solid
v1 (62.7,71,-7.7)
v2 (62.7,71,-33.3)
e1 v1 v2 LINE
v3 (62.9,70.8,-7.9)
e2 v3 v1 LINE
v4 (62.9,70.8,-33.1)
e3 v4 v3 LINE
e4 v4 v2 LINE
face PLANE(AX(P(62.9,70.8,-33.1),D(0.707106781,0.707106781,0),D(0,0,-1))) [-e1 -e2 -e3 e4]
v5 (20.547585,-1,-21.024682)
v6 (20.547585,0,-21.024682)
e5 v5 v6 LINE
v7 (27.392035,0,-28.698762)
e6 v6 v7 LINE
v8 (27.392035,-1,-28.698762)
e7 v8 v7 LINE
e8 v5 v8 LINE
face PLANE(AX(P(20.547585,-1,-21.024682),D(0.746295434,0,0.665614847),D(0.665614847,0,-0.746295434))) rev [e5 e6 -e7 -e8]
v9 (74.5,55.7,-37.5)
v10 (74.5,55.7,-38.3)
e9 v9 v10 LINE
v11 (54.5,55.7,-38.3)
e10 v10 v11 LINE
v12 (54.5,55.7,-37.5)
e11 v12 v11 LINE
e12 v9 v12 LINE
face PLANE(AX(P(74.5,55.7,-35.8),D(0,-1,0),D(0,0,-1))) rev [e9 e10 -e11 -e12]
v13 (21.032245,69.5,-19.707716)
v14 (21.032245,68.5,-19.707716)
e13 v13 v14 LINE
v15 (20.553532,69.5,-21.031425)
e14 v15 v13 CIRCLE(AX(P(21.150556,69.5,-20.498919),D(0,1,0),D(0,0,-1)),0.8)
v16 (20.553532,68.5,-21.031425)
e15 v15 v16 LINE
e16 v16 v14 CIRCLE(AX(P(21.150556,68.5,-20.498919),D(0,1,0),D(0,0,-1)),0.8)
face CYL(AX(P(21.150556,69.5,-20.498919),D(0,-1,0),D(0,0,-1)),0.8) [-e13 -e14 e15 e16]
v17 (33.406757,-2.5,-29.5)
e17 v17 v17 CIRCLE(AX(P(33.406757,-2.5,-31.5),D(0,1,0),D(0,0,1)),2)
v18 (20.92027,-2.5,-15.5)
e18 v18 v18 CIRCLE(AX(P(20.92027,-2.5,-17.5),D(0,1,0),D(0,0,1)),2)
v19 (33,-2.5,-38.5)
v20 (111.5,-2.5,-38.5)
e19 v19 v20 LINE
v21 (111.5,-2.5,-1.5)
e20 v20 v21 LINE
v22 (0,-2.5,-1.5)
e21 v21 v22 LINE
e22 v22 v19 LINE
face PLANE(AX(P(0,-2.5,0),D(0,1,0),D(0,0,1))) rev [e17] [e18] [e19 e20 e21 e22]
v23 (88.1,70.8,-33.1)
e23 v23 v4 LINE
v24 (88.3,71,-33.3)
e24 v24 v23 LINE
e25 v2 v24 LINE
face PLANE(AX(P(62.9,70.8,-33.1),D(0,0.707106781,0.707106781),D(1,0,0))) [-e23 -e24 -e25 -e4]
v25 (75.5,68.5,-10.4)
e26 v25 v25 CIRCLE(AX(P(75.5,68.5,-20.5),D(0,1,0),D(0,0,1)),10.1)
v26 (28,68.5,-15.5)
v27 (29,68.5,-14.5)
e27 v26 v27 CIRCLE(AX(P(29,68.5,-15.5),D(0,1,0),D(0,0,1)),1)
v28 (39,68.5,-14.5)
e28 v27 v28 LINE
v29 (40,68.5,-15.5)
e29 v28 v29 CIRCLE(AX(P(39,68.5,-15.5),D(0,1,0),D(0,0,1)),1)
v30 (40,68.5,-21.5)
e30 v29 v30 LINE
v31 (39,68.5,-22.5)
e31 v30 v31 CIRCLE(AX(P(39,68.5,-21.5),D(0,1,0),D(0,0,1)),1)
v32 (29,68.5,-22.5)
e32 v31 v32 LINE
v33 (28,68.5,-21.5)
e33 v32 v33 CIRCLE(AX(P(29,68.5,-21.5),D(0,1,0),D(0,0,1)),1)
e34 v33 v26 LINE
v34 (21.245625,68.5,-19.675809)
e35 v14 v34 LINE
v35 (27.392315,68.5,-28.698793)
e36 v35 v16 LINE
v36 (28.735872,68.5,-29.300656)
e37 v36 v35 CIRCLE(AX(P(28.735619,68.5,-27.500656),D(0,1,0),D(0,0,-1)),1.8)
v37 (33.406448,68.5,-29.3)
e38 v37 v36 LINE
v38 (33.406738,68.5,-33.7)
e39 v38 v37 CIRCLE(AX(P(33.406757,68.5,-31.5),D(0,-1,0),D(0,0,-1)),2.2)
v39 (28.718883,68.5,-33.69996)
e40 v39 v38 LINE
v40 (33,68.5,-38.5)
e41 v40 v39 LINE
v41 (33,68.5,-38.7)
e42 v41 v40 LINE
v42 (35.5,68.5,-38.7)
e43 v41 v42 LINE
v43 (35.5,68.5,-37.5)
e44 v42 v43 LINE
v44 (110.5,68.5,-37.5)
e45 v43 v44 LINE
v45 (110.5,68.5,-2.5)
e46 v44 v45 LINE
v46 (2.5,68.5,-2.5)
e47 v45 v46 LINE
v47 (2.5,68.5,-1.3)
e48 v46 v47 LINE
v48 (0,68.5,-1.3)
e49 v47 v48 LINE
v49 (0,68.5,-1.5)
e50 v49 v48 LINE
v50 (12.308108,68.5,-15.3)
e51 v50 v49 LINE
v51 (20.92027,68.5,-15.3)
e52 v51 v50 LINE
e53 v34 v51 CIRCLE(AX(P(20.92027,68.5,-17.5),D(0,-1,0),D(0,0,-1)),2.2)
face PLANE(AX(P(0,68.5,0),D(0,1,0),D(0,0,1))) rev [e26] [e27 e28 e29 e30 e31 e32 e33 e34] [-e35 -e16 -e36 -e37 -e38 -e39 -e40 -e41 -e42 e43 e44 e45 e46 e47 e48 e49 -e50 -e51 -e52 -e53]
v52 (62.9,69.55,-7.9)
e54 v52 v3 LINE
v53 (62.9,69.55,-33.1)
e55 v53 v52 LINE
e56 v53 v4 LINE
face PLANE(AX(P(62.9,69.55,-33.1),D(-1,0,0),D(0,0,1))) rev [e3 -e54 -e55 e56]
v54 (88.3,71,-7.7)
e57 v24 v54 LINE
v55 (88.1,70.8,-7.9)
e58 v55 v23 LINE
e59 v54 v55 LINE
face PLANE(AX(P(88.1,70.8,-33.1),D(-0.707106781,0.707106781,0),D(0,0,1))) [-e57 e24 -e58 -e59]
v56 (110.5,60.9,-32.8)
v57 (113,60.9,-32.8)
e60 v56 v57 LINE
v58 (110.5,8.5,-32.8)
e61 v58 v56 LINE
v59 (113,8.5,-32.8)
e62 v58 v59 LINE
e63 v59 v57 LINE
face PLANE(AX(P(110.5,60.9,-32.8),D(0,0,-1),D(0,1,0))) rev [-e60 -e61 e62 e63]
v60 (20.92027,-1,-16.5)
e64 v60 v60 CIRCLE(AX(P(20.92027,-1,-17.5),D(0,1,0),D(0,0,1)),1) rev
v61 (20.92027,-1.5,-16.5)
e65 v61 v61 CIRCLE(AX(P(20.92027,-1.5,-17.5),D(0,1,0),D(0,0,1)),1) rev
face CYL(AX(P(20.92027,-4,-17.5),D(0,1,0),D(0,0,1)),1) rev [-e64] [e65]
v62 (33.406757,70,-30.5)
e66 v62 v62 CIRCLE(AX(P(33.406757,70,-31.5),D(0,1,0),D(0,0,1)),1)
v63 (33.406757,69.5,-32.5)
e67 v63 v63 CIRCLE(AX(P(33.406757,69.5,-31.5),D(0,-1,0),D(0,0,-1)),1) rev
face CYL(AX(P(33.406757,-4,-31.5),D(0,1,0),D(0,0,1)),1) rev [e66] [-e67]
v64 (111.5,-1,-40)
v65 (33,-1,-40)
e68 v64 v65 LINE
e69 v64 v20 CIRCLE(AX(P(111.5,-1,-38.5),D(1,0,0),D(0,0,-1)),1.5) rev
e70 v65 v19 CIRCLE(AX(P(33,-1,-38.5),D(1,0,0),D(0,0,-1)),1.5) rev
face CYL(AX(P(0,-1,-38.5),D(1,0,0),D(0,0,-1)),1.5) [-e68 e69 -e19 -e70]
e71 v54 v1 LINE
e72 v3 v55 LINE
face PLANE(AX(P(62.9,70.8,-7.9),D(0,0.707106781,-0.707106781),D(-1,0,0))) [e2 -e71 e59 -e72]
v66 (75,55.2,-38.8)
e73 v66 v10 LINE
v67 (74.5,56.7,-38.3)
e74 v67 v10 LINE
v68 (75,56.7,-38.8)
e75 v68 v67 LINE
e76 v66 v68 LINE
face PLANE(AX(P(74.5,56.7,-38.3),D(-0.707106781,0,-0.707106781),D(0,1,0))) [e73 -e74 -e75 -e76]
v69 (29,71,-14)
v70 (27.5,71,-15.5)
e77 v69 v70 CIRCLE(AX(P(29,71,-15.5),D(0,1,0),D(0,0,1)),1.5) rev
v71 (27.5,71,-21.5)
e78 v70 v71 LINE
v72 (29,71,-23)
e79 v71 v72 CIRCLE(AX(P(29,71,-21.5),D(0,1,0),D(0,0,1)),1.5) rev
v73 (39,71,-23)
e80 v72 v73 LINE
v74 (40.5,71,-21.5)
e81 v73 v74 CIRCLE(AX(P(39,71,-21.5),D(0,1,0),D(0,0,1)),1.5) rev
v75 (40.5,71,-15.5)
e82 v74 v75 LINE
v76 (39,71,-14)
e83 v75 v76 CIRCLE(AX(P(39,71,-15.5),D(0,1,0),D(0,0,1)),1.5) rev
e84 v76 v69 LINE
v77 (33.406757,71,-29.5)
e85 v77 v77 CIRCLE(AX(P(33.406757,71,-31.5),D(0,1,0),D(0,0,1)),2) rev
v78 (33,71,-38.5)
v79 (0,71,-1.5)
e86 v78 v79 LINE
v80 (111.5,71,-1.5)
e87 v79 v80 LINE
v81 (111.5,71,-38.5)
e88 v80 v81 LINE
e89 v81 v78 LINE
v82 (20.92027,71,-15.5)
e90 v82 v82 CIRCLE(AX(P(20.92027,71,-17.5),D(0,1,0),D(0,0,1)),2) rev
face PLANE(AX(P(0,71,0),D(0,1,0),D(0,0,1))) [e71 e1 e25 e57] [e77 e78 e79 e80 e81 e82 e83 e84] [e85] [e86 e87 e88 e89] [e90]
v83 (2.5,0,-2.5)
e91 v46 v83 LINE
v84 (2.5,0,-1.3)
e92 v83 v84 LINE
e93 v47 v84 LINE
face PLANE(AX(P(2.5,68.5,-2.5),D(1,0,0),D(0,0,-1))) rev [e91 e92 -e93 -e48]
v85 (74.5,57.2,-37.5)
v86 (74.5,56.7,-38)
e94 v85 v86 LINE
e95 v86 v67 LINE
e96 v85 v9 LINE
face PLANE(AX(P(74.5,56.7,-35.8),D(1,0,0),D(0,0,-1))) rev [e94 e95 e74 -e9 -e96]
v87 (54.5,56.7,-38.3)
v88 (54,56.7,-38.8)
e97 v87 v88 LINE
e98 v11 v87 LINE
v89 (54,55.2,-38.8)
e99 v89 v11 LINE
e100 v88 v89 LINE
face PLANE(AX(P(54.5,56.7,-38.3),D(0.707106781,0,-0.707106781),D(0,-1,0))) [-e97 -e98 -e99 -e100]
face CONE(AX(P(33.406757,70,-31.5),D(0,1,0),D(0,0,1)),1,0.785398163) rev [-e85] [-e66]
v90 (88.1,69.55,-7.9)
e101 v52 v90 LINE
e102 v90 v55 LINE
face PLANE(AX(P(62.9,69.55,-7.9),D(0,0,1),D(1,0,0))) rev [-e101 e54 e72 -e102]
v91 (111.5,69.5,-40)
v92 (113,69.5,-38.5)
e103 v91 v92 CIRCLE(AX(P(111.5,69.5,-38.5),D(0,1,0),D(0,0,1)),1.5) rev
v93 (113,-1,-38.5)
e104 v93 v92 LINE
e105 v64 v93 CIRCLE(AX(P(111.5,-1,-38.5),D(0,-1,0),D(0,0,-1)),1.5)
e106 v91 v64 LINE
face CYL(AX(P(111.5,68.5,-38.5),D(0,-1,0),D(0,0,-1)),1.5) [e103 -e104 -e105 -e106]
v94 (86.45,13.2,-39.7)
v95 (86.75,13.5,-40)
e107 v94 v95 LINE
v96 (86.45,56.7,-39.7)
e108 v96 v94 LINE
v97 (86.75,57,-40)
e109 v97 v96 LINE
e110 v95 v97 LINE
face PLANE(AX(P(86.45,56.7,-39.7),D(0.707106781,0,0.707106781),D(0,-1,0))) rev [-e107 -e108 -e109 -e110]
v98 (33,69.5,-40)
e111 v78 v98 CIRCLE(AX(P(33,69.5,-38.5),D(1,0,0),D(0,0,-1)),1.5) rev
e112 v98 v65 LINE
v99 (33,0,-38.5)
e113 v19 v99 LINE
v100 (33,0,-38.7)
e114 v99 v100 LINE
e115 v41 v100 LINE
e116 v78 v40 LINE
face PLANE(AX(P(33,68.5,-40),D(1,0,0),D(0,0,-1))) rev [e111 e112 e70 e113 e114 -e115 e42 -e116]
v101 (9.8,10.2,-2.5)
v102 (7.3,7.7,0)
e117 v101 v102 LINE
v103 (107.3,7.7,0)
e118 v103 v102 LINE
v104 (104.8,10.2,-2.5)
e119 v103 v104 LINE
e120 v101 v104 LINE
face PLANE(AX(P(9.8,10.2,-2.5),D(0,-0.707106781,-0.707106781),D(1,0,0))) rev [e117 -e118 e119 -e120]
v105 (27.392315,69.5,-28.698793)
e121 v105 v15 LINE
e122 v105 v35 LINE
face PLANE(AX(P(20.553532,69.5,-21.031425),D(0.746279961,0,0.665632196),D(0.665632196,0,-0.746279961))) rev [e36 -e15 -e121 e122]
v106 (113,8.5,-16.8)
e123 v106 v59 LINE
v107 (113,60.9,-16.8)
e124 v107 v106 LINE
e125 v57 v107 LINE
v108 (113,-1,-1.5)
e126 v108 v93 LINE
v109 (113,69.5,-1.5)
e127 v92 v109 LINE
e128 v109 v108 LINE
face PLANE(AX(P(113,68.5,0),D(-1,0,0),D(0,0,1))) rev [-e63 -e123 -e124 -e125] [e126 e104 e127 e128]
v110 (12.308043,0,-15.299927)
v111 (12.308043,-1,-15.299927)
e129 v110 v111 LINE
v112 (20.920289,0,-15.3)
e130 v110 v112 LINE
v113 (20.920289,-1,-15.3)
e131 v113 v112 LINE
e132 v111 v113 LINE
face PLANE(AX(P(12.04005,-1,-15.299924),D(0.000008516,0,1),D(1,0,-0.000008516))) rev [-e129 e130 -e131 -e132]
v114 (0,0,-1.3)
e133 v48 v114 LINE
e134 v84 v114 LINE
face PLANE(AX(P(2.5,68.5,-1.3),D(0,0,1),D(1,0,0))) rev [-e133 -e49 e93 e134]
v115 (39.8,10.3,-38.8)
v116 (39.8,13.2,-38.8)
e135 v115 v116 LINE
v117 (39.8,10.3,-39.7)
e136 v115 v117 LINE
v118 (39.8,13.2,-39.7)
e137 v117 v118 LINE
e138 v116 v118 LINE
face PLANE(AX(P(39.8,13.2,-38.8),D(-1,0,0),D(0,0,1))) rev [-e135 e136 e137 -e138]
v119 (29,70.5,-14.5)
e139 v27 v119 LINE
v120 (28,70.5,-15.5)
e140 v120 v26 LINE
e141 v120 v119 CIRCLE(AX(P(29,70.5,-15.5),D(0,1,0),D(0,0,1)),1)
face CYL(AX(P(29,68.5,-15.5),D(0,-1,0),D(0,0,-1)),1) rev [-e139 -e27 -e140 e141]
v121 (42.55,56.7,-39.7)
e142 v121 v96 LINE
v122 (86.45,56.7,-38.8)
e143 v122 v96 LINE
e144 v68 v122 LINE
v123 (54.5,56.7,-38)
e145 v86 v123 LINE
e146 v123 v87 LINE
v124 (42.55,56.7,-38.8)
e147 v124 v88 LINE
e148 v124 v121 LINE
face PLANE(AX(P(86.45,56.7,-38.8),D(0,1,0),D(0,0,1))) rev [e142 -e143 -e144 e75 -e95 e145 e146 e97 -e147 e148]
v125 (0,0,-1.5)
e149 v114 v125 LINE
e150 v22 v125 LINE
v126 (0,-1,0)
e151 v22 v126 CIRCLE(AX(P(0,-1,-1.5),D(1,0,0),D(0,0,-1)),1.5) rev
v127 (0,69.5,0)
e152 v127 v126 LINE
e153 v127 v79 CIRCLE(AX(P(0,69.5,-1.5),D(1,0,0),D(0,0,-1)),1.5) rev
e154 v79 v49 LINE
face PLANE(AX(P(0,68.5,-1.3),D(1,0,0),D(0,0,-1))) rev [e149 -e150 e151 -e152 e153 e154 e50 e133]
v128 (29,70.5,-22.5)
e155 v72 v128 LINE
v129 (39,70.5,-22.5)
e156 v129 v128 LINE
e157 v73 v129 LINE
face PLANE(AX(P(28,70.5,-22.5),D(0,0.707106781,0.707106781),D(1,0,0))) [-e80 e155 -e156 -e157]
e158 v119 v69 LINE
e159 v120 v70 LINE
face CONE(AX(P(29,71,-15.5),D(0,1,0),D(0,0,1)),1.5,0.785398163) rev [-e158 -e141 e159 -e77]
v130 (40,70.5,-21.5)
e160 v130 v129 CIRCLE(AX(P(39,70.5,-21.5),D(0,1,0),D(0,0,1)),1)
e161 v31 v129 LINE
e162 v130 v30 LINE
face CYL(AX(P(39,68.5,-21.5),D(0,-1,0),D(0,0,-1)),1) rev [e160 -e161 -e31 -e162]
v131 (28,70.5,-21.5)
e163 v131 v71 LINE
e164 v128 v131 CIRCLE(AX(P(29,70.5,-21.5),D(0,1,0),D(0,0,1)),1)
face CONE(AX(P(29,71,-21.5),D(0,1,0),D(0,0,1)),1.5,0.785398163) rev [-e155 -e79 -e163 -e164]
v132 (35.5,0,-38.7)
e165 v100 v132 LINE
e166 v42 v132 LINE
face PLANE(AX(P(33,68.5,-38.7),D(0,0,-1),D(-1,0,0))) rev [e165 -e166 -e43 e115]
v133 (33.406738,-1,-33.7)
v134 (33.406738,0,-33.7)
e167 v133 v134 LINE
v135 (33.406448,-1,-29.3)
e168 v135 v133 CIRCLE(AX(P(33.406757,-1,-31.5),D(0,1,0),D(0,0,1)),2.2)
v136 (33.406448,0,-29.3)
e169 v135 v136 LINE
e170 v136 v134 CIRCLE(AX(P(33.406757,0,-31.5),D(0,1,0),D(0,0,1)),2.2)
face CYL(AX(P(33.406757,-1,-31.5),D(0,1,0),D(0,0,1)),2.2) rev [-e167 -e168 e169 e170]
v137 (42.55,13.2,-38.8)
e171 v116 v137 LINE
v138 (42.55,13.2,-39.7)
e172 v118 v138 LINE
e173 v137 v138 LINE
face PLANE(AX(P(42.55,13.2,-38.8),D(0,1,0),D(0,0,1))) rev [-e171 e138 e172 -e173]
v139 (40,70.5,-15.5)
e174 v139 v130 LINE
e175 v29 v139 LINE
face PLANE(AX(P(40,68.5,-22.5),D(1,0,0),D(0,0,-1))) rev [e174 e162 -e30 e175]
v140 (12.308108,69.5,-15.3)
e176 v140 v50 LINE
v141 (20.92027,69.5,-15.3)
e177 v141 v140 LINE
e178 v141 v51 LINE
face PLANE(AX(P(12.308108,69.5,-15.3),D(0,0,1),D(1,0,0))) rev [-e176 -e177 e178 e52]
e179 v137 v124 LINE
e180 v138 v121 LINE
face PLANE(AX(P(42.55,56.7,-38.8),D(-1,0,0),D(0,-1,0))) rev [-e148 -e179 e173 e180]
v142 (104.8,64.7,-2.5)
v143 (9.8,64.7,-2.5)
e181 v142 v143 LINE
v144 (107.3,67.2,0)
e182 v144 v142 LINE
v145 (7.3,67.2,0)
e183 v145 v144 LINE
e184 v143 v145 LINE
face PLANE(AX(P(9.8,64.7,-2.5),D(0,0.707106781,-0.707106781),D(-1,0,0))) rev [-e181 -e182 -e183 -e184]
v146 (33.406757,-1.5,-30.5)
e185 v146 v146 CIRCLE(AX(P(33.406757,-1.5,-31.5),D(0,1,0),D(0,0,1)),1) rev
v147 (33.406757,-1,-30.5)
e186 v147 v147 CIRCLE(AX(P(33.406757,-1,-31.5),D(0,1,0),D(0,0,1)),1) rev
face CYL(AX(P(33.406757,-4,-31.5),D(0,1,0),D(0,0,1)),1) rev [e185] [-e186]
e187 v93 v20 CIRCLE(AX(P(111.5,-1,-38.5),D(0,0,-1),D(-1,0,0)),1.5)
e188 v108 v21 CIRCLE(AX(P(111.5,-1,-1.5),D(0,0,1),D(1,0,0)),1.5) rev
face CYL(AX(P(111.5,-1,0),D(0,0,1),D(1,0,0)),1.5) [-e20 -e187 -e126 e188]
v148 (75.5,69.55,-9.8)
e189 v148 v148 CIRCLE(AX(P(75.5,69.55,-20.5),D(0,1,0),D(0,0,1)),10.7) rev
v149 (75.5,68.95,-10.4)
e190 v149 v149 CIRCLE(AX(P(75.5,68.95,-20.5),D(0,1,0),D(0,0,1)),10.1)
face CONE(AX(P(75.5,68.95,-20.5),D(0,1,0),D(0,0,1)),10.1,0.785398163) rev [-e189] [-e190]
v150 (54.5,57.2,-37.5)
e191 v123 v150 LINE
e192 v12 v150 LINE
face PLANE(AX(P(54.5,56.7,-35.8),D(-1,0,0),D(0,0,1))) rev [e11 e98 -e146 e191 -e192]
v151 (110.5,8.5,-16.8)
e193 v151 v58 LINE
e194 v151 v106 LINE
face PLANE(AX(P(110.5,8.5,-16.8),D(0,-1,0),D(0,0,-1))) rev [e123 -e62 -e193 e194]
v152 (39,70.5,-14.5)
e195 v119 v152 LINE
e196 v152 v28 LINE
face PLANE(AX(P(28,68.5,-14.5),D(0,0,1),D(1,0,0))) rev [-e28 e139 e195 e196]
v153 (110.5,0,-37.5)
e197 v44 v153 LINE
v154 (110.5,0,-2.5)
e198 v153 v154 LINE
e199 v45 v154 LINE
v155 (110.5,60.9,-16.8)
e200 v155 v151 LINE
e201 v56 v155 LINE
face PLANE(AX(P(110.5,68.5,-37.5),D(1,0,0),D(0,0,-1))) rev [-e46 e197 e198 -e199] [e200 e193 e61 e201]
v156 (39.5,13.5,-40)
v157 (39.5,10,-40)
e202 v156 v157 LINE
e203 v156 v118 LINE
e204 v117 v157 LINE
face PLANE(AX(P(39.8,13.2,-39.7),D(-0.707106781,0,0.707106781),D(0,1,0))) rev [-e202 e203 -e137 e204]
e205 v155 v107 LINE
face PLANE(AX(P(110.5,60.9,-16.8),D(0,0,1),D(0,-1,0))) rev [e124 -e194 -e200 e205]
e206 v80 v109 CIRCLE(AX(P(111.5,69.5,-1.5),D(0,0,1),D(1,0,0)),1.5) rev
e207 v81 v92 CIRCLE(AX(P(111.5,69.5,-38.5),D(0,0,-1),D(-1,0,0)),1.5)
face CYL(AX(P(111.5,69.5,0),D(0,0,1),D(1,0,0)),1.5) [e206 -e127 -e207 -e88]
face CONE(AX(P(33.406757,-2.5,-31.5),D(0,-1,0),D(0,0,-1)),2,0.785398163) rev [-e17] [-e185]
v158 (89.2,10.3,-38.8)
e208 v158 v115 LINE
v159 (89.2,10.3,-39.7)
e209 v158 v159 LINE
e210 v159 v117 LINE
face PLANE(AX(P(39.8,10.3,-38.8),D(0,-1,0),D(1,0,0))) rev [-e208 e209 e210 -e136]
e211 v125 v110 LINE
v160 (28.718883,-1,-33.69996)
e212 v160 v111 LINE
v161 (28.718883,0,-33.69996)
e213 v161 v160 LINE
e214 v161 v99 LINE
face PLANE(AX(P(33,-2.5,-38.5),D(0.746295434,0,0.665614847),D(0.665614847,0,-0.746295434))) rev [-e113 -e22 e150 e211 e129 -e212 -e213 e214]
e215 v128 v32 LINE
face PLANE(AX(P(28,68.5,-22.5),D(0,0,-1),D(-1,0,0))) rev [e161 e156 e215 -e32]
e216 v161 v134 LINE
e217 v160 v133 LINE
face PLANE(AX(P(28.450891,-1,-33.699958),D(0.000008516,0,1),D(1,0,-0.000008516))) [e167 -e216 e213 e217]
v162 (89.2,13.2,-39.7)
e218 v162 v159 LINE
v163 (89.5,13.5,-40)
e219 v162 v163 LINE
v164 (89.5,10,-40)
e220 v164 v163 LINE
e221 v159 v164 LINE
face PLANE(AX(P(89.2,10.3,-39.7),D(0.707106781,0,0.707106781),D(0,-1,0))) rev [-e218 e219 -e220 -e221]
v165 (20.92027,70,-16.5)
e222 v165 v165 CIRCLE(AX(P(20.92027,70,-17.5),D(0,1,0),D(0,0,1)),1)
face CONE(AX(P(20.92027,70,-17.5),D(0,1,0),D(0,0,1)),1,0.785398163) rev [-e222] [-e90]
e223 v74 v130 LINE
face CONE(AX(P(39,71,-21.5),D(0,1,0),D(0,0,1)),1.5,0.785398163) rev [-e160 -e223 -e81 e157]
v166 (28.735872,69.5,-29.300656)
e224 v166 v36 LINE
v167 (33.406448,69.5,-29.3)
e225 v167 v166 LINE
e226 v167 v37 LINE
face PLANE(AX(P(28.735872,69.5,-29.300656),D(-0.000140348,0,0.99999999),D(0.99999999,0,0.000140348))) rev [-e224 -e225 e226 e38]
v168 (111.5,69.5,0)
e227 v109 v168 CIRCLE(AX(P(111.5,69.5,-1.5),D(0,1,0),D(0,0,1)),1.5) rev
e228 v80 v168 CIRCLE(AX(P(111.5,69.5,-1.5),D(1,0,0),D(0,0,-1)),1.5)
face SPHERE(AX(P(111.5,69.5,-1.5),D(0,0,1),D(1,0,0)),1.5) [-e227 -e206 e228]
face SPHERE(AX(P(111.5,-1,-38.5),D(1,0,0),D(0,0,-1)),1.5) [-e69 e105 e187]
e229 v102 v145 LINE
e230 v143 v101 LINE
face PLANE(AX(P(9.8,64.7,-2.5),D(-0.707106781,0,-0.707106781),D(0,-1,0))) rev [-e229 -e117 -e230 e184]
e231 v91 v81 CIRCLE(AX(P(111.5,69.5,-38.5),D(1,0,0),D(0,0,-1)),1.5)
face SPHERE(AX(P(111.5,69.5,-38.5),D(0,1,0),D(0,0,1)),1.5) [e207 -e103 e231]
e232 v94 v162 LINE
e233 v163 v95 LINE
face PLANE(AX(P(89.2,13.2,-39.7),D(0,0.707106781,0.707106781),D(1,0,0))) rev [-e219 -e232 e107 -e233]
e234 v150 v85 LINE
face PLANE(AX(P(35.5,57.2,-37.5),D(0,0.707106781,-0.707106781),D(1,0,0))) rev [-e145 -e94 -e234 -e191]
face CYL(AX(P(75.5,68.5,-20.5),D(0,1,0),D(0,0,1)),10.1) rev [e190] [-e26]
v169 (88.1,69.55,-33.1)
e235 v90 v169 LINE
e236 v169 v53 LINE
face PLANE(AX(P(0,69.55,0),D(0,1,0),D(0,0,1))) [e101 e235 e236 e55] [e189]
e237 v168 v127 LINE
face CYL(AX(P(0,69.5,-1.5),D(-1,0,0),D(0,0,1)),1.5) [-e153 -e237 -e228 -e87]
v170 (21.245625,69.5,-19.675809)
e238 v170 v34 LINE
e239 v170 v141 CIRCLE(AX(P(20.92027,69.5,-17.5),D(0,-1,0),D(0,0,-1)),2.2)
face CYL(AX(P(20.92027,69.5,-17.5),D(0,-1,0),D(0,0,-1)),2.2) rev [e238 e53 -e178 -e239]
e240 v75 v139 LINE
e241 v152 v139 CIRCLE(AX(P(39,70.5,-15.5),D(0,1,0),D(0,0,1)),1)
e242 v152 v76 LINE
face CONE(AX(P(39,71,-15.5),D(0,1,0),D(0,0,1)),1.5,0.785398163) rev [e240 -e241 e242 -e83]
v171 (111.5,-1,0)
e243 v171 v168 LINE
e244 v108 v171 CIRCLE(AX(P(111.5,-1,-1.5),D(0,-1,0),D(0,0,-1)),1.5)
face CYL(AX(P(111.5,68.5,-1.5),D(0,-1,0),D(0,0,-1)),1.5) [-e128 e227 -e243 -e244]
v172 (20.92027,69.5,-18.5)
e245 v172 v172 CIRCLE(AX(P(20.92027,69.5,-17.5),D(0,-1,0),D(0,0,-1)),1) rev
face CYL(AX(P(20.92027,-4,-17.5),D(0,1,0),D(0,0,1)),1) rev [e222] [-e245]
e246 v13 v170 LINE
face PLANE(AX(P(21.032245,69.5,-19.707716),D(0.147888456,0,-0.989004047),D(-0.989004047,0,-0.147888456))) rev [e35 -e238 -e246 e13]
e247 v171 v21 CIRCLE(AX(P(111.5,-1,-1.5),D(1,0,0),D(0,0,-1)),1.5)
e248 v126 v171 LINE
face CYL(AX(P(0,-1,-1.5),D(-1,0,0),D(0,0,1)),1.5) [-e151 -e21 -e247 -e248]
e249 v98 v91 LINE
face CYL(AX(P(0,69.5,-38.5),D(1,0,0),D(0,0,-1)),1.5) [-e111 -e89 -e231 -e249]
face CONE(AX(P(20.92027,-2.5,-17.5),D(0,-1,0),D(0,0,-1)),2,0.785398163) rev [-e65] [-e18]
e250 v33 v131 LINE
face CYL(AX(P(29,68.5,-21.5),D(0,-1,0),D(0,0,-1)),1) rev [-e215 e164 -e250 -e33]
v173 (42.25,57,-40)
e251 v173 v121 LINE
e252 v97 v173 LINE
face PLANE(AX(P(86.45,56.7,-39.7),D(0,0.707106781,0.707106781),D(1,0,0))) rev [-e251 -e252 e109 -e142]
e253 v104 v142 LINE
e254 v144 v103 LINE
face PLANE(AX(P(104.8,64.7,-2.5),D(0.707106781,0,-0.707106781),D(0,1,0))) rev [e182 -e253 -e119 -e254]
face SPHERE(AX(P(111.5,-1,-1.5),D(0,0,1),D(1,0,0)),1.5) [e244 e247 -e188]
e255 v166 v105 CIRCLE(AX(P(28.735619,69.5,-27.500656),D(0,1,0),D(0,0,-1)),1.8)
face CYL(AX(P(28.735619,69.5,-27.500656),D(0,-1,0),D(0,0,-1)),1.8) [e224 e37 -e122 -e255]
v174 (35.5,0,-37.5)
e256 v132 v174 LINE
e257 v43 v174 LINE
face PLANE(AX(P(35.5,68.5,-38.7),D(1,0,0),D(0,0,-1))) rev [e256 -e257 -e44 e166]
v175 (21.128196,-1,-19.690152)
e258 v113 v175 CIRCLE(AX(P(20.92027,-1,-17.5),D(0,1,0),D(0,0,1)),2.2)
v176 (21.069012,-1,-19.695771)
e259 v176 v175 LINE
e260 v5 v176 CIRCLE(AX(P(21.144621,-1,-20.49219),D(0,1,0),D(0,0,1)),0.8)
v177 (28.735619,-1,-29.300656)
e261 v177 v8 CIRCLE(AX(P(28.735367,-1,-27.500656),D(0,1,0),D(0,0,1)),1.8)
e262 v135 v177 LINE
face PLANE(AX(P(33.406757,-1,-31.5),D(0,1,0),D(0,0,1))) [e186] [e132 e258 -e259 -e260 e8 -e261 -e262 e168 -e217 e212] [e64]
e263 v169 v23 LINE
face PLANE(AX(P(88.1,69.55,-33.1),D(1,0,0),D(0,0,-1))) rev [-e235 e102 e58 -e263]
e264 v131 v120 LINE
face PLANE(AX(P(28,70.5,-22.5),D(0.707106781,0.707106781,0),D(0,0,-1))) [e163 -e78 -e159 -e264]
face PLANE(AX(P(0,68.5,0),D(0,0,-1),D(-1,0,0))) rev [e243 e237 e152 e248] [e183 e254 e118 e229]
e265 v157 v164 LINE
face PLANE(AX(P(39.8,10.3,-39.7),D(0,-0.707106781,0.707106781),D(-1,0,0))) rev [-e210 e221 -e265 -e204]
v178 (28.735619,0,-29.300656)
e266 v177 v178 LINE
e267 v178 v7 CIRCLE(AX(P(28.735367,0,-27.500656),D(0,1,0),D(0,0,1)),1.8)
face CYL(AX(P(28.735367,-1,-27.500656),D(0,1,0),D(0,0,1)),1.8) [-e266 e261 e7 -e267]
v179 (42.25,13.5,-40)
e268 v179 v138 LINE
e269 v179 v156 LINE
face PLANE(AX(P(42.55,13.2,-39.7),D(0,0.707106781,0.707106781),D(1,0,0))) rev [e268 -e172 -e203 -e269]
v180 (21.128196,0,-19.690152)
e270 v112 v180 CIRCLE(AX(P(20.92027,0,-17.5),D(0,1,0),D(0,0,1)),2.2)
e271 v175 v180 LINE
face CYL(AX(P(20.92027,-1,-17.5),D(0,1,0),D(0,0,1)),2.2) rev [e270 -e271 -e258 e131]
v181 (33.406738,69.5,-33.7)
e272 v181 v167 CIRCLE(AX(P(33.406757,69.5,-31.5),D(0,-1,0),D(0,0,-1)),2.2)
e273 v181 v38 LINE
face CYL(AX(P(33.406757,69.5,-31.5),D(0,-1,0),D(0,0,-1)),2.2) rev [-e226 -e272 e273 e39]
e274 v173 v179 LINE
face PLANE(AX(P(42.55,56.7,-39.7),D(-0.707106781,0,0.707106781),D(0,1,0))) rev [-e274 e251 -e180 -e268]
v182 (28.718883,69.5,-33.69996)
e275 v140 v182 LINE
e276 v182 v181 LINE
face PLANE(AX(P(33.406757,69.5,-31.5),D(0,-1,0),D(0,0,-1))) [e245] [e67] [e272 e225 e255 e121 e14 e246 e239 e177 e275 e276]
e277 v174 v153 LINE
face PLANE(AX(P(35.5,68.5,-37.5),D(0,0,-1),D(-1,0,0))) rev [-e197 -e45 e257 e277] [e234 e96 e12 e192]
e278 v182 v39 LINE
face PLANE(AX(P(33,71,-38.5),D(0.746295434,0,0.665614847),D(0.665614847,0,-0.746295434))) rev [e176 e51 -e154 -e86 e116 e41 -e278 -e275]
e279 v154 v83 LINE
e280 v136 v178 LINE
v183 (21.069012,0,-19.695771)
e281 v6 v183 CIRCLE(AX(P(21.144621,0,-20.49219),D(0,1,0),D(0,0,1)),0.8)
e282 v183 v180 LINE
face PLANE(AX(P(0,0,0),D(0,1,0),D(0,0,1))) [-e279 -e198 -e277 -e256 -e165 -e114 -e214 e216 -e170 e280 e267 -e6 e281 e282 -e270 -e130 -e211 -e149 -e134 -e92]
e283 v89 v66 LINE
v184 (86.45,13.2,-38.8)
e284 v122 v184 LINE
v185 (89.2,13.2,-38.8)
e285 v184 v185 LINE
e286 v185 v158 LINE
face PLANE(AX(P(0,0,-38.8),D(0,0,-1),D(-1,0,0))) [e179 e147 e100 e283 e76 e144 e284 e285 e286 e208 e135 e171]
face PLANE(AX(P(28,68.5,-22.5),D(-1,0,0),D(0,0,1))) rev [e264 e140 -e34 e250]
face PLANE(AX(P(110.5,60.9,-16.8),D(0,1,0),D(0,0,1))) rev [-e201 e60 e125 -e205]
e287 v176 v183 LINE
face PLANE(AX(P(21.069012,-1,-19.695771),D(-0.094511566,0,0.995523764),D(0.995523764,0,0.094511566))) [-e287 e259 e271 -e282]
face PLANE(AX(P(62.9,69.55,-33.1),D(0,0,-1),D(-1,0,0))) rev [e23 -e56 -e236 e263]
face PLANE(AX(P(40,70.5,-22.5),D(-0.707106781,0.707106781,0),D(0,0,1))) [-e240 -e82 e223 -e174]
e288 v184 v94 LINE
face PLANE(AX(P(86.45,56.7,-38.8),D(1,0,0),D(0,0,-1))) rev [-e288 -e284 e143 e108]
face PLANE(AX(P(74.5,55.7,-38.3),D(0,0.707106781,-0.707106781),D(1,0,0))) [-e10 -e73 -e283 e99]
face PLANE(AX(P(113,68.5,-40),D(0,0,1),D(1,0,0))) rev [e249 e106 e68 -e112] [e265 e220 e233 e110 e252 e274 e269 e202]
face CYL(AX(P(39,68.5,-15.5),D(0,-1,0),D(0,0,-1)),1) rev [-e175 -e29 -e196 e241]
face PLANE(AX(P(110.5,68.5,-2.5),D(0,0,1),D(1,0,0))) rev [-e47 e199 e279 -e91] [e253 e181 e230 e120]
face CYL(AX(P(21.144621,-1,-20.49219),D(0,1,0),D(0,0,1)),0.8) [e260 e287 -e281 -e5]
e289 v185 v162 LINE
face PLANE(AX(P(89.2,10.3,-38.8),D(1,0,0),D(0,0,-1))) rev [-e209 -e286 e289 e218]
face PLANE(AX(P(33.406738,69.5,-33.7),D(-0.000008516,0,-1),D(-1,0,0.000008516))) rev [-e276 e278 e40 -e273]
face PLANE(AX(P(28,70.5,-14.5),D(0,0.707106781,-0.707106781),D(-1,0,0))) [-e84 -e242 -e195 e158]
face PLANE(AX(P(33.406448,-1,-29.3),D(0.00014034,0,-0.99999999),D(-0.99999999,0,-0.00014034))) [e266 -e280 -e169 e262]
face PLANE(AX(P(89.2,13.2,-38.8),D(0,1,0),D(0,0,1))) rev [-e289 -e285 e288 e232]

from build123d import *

# Parameters (mm, degrees)
BOSS_EXTRU_1_DEPTH       = 68.5
BOSS_EXTRU_2_DEPTH       = 2.5
ESQUISSE4_W              = 95
ESQUISSE4_H              = 54.5
ENL_V_MAT_EXTRU_1_DEPTH  = 2.5
ESQUISSE5_W              = 16
ESQUISSE5_H              = 52.4
ENL_V_MAT_EXTRU_2_DEPTH  = 2.5
BOSS_EXTRU_3_DEPTH       = 2.5
CHANFREIN1_SIZE          = 2.5
CONG_1_R                 = 1.5
ENL_V_MAT_EXTRU_3_DEPTH  = 1.2
CHANFREIN2_SIZE          = 0.3
ESQUISSE8_W              = 20
ESQUISSE8_H              = 1
ENL_V_MAT_EXTRU_4_DEPTH  = 3
CHANFREIN3_SIZE          = 0.5
CHANFREIN4_SIZE          = 0.5
ESQUISSE9_R              = 1
ENL_V_MAT_EXTRU_5_DEPTH  = 75
CHANFREIN5_SIZE          = 1
CHANFREIN6_SIZE          = 1
ENL_V_MAT_EXTRU_6_DEPTH  = 1
ENL_V_START              = -1
ENL_V_MAT_EXTRU_7_DEPTH  = 1
ESQUISSE13_W             = 12
ESQUISSE13_H             = 8
ENL_V_MAT_EXTRU_8_DEPTH  = 2.5
CONG_2_R                 = 1
CHANFREIN7_SIZE          = 0.5
ESQUISSE14_W             = 25.2
ESQUISSE14_H             = 25.2
ENL_V_MAT_EXTRU_9_DEPTH  = 1.45
CHANFREIN8_SIZE          = 0.2
ESQUISSE15_R             = 10.1
ENL_V_MAT_EXTRU_10_DEPTH = 1.05
CHANFREIN9_SIZE          = 0.6


with BuildPart() as part:
    # Esquisse2 → Boss.-Extru.1 (new body)
    with BuildSketch(Plane(origin=(0, 0, 0), x_dir=(1, 0, 0), z_dir=(0, 1, 0))):
        Polygon((0, 0), (113, 0), (113, 40), (33, 40), (33, 38.7), (35.5, 38.7), (35.5, 37.5), (110.5, 37.5), (110.5, 2.5), (2.5, 2.5), (2.5, 1.3), (0, 1.3), align=None)
    extrude(amount=BOSS_EXTRU_1_DEPTH)

    # Esquisse3 → Boss.-Extru.2 (add)
    with BuildSketch(Plane.XZ):
        Polygon((0, 0), (113, 0), (113, -40), (33, -40), (33, -38.5), (0, -1.5), align=None)
    extrude(amount=BOSS_EXTRU_2_DEPTH)

    # Esquisse4 → Enlèv. mat.-Extru.1 (cut)
    with BuildSketch(Plane.XY):
        with Locations((57.3, 37.45)):
            Rectangle(ESQUISSE4_W, ESQUISSE4_H)
    extrude(amount=-ENL_V_MAT_EXTRU_1_DEPTH, mode=Mode.SUBTRACT)

    # Esquisse5 → Enlèv. mat.-Extru.2 (cut)
    with BuildSketch(Plane(origin=(113, 0, 0), x_dir=(0, 0, -1), z_dir=(1, 0, 0))):
        with Locations((24.8, 34.7)):
            Rectangle(ESQUISSE5_W, ESQUISSE5_H)
    extrude(amount=-ENL_V_MAT_EXTRU_2_DEPTH, mode=Mode.SUBTRACT)

    # Esquisse6 → Boss.-Extru.3 (add)
    with BuildSketch(Plane(origin=(0, 68.5, 0), x_dir=(1, 0, 0), z_dir=(0, 1, 0))):
        Polygon((33, 40), (33, 38.5), (0, 1.5), (0, 0), (113, 0), (113, 40), align=None)
    extrude(amount=BOSS_EXTRU_3_DEPTH)

    # Chanfrein1
    chanfrein1_edges = [part.edges().sort_by_distance(p)[0] for p in [
        (57.3, 10.2, 0),
        (104.8, 37.45, 0),
        (57.3, 64.7, 0),
        (9.8, 37.45, 0),
    ]]
    chamfer(chanfrein1_edges, length=CHANFREIN1_SIZE - 0.0001)  # a hair under: the kernel refuses the full size

    # Congé1
    cong_1_edges = [part.edges().sort_by_distance(p)[0] for p in [
        (73, -2.5, -40),
        (113, -2.5, -20),
        (113, 34.25, -40),
        (56.5, -2.5, 0),
        (113, 34.25, 0),
        (73, 71, -40),
        (113, 71, -20),
        (56.5, 71, 0),
    ]]
    fillet(cong_1_edges, radius=CONG_1_R)

    # Esquisse7 → Enlèv. mat.-Extru.3 (cut)
    with BuildSketch(Plane(origin=(0, 0, -40), x_dir=(-1, 0, 0), z_dir=(0, 0, -1))):
        Polygon((-86.45, 56.7), (-42.55, 56.7), (-42.55, 13.2), (-39.8, 13.2), (-39.8, 10.3), (-89.2, 10.3), (-89.2, 13.2), (-86.45, 13.2), align=None)
    extrude(amount=-ENL_V_MAT_EXTRU_3_DEPTH, mode=Mode.SUBTRACT)

    # Chanfrein2
    chanfrein2_edges = [part.edges().sort_by_distance(p)[0] for p in [
        (86.45, 34.95, -40),
        (87.825, 13.2, -40),
        (89.2, 11.75, -40),
        (64.5, 10.3, -40),
        (39.8, 11.75, -40),
        (41.175, 13.2, -40),
        (42.55, 34.95, -40),
        (64.5, 56.7, -40),
    ]]
    chamfer(chanfrein2_edges, length=CHANFREIN2_SIZE)

    # Esquisse8 → Enlèv. mat.-Extru.4 (cut)
    with BuildSketch(Plane(origin=(0, 0, -38.8), x_dir=(-1, 0, 0), z_dir=(0, 0, -1))):
        with Locations((-64.5, 56.2)):
            Rectangle(ESQUISSE8_W, ESQUISSE8_H)
    extrude(amount=-ENL_V_MAT_EXTRU_4_DEPTH, mode=Mode.SUBTRACT)

    # Chanfrein3
    chanfrein3_edges = [part.edges().sort_by_distance(p)[0] for p in [
        (74.5, 56.2, -38.8),
        (64.5, 55.7, -38.8),
        (54.5, 56.2, -38.8),
    ]]
    chamfer(chanfrein3_edges, length=CHANFREIN3_SIZE)

    # Chanfrein4
    chanfrein4_edges = [part.edges().sort_by_distance(p)[0] for p in [
        (64.5, 56.7, -37.5),
    ]]
    chamfer(chanfrein4_edges, length=CHANFREIN4_SIZE)

    # Esquisse9 → Enlèv. mat.-Extru.5 (cut)
    with BuildSketch(Plane(origin=(0, 71, 0), x_dir=(1, 0, 0), z_dir=(0, 1, 0))):
        with Locations(Location((20.92027027, 17.5, 0), (0, 0, 270))):
            Circle(ESQUISSE9_R)
        with Locations(Location((33.406756757, 31.5, 0), (0, 0, 270))):
            Circle(ESQUISSE9_R)
    extrude(amount=-ENL_V_MAT_EXTRU_5_DEPTH, mode=Mode.SUBTRACT)

    # Chanfrein5
    chanfrein5_edges = [part.edges().sort_by_distance(p)[0] for p in [
        (20.92027027, 71, -18.5),
        (33.406756757, 71, -32.5),
    ]]
    chamfer(chanfrein5_edges, length=CHANFREIN5_SIZE)

    # Chanfrein6
    chanfrein6_edges = [part.edges().sort_by_distance(p)[0] for p in [
        (20.92027027, -2.5, -18.5),
        (33.406756757, -2.5, -32.5),
    ]]
    chamfer(chanfrein6_edges, length=CHANFREIN6_SIZE)

    # Esquisse10 → Enlèv. mat.-Extru.6 (cut)
    with BuildSketch(Plane(origin=(0, 0, 0), x_dir=(1, 0, 0), z_dir=(0, 1, 0))):
        with BuildLine():
            Line((12.040050277, 15.299924377), (28.450890894, 33.699957797))
            Line((28.450890894, 33.699957797), (33.406738022, 33.7))
            ThreePointArc((33.406738022, 33.7), (35.606756752, 31.499854993), (33.406448008, 29.300000022))
            Line((33.406448008, 29.300000022), (28.735619265, 29.300655526))
            ThreePointArc((28.735619265, 29.300655526), (27.99947652, 29.143356281), (27.392034871, 28.698762269))
            Line((27.392034871, 28.698762269), (20.547584791, 21.024681875))
            ThreePointArc((20.547584791, 21.024681875), (20.399896986, 20.199981277), (21.069011886, 19.695770987))
            Line((21.069011886, 19.695770987), (21.128195715, 19.69015228))
            ThreePointArc((21.128195715, 19.69015228), (23.117807404, 17.395930099), (20.920289005, 15.3))
            Line((20.920289005, 15.3), (12.040050277, 15.299924377))
        make_face()
    extrude(amount=-ENL_V_MAT_EXTRU_6_DEPTH, mode=Mode.SUBTRACT)

    # Esquisse12 → Enlèv. mat.-Extru.7 (cut)
    with BuildSketch(Plane.XZ.offset(-68.5).offset(ENL_V_START)):
        with BuildLine():
            Line((12.308108108, -15.3), (20.92027027, -15.3))
            ThreePointArc((20.92027027, -15.3), (23.11421416, -17.336873648), (21.245624873, -19.675808903))
            Line((21.245624873, -19.675808903), (21.03224488, -19.707716192))
            ThreePointArc((21.03224488, -19.707716192), (20.398241002, -20.226848336), (20.553531675, -21.031425186))
            Line((20.553531675, -21.031425186), (27.392315335, -28.698793496))
            ThreePointArc((27.392315335, -28.698793496), (27.999748232, -29.143364838), (28.735871891, -29.300655526))
            Line((28.735871891, -29.300655526), (33.406447992, -29.300000022))
            ThreePointArc((33.406447992, -29.300000022), (35.606756752, -31.499854985), (33.406738022, -33.7))
            Line((33.406738022, -33.7), (28.718883313, -33.699960079))
            Line((28.718883313, -33.699960079), (12.308108108, -15.3))
        make_face()
    extrude(amount=ENL_V_MAT_EXTRU_7_DEPTH, mode=Mode.SUBTRACT)

    # Esquisse13 → Enlèv. mat.-Extru.8 (cut)
    with BuildSketch(Plane(origin=(0, 71, 0), x_dir=(1, 0, 0), z_dir=(0, 1, 0))):
        with Locations((34, 18.5)):
            Rectangle(ESQUISSE13_W, ESQUISSE13_H)
    extrude(amount=-ENL_V_MAT_EXTRU_8_DEPTH, mode=Mode.SUBTRACT)

    # Congé2
    cong_2_edges = [part.edges().sort_by_distance(p)[0] for p in [
        (28, 69.75, -14.5),
        (28, 69.75, -22.5),
        (40, 69.75, -22.5),
        (40, 69.75, -14.5),
    ]]
    fillet(cong_2_edges, radius=CONG_2_R)

    # Chanfrein7
    chanfrein7_edges = [part.edges().sort_by_distance(p)[0] for p in [
        (28, 71, -18.5),
        (34, 71, -22.5),
        (40, 71, -18.5),
        (34, 71, -14.5),
        (28.292893219, 71, -22.207106781),
        (39.707106781, 71, -22.207106781),
        (39.707106781, 71, -14.792893219),
        (28.292893219, 71, -14.792893219),
    ]]
    chamfer(chanfrein7_edges, length=CHANFREIN7_SIZE)

    # Esquisse14 → Enlèv. mat.-Extru.9 (cut)
    with BuildSketch(Plane(origin=(0, 71, 0), x_dir=(1, 0, 0), z_dir=(0, 1, 0))):
        with Locations((75.5, 20.5)):
            Rectangle(ESQUISSE14_W, ESQUISSE14_H)
    extrude(amount=-ENL_V_MAT_EXTRU_9_DEPTH, mode=Mode.SUBTRACT)

    # Chanfrein8
    chanfrein8_edges = [part.edges().sort_by_distance(p)[0] for p in [
        (62.9, 71, -20.5),
        (75.5, 71, -7.9),
        (88.1, 71, -20.5),
        (75.5, 71, -33.1),
    ]]
    chamfer(chanfrein8_edges, length=CHANFREIN8_SIZE)

    # Esquisse15 → Enlèv. mat.-Extru.10 (cut)
    with BuildSketch(Plane(origin=(0, 69.55, 0), x_dir=(1, 0, 0), z_dir=(0, 1, 0))):
        with Locations(Location((75.5, 20.5, 0), (0, 0, 270))):
            Circle(ESQUISSE15_R)
    extrude(amount=-ENL_V_MAT_EXTRU_10_DEPTH, mode=Mode.SUBTRACT)

    # Chanfrein9
    chanfrein9_edges = [part.edges().sort_by_distance(p)[0] for p in [
        (75.5, 69.55, -30.6),
    ]]
    chamfer(chanfrein9_edges, length=CHANFREIN9_SIZE)


solid = part.part
